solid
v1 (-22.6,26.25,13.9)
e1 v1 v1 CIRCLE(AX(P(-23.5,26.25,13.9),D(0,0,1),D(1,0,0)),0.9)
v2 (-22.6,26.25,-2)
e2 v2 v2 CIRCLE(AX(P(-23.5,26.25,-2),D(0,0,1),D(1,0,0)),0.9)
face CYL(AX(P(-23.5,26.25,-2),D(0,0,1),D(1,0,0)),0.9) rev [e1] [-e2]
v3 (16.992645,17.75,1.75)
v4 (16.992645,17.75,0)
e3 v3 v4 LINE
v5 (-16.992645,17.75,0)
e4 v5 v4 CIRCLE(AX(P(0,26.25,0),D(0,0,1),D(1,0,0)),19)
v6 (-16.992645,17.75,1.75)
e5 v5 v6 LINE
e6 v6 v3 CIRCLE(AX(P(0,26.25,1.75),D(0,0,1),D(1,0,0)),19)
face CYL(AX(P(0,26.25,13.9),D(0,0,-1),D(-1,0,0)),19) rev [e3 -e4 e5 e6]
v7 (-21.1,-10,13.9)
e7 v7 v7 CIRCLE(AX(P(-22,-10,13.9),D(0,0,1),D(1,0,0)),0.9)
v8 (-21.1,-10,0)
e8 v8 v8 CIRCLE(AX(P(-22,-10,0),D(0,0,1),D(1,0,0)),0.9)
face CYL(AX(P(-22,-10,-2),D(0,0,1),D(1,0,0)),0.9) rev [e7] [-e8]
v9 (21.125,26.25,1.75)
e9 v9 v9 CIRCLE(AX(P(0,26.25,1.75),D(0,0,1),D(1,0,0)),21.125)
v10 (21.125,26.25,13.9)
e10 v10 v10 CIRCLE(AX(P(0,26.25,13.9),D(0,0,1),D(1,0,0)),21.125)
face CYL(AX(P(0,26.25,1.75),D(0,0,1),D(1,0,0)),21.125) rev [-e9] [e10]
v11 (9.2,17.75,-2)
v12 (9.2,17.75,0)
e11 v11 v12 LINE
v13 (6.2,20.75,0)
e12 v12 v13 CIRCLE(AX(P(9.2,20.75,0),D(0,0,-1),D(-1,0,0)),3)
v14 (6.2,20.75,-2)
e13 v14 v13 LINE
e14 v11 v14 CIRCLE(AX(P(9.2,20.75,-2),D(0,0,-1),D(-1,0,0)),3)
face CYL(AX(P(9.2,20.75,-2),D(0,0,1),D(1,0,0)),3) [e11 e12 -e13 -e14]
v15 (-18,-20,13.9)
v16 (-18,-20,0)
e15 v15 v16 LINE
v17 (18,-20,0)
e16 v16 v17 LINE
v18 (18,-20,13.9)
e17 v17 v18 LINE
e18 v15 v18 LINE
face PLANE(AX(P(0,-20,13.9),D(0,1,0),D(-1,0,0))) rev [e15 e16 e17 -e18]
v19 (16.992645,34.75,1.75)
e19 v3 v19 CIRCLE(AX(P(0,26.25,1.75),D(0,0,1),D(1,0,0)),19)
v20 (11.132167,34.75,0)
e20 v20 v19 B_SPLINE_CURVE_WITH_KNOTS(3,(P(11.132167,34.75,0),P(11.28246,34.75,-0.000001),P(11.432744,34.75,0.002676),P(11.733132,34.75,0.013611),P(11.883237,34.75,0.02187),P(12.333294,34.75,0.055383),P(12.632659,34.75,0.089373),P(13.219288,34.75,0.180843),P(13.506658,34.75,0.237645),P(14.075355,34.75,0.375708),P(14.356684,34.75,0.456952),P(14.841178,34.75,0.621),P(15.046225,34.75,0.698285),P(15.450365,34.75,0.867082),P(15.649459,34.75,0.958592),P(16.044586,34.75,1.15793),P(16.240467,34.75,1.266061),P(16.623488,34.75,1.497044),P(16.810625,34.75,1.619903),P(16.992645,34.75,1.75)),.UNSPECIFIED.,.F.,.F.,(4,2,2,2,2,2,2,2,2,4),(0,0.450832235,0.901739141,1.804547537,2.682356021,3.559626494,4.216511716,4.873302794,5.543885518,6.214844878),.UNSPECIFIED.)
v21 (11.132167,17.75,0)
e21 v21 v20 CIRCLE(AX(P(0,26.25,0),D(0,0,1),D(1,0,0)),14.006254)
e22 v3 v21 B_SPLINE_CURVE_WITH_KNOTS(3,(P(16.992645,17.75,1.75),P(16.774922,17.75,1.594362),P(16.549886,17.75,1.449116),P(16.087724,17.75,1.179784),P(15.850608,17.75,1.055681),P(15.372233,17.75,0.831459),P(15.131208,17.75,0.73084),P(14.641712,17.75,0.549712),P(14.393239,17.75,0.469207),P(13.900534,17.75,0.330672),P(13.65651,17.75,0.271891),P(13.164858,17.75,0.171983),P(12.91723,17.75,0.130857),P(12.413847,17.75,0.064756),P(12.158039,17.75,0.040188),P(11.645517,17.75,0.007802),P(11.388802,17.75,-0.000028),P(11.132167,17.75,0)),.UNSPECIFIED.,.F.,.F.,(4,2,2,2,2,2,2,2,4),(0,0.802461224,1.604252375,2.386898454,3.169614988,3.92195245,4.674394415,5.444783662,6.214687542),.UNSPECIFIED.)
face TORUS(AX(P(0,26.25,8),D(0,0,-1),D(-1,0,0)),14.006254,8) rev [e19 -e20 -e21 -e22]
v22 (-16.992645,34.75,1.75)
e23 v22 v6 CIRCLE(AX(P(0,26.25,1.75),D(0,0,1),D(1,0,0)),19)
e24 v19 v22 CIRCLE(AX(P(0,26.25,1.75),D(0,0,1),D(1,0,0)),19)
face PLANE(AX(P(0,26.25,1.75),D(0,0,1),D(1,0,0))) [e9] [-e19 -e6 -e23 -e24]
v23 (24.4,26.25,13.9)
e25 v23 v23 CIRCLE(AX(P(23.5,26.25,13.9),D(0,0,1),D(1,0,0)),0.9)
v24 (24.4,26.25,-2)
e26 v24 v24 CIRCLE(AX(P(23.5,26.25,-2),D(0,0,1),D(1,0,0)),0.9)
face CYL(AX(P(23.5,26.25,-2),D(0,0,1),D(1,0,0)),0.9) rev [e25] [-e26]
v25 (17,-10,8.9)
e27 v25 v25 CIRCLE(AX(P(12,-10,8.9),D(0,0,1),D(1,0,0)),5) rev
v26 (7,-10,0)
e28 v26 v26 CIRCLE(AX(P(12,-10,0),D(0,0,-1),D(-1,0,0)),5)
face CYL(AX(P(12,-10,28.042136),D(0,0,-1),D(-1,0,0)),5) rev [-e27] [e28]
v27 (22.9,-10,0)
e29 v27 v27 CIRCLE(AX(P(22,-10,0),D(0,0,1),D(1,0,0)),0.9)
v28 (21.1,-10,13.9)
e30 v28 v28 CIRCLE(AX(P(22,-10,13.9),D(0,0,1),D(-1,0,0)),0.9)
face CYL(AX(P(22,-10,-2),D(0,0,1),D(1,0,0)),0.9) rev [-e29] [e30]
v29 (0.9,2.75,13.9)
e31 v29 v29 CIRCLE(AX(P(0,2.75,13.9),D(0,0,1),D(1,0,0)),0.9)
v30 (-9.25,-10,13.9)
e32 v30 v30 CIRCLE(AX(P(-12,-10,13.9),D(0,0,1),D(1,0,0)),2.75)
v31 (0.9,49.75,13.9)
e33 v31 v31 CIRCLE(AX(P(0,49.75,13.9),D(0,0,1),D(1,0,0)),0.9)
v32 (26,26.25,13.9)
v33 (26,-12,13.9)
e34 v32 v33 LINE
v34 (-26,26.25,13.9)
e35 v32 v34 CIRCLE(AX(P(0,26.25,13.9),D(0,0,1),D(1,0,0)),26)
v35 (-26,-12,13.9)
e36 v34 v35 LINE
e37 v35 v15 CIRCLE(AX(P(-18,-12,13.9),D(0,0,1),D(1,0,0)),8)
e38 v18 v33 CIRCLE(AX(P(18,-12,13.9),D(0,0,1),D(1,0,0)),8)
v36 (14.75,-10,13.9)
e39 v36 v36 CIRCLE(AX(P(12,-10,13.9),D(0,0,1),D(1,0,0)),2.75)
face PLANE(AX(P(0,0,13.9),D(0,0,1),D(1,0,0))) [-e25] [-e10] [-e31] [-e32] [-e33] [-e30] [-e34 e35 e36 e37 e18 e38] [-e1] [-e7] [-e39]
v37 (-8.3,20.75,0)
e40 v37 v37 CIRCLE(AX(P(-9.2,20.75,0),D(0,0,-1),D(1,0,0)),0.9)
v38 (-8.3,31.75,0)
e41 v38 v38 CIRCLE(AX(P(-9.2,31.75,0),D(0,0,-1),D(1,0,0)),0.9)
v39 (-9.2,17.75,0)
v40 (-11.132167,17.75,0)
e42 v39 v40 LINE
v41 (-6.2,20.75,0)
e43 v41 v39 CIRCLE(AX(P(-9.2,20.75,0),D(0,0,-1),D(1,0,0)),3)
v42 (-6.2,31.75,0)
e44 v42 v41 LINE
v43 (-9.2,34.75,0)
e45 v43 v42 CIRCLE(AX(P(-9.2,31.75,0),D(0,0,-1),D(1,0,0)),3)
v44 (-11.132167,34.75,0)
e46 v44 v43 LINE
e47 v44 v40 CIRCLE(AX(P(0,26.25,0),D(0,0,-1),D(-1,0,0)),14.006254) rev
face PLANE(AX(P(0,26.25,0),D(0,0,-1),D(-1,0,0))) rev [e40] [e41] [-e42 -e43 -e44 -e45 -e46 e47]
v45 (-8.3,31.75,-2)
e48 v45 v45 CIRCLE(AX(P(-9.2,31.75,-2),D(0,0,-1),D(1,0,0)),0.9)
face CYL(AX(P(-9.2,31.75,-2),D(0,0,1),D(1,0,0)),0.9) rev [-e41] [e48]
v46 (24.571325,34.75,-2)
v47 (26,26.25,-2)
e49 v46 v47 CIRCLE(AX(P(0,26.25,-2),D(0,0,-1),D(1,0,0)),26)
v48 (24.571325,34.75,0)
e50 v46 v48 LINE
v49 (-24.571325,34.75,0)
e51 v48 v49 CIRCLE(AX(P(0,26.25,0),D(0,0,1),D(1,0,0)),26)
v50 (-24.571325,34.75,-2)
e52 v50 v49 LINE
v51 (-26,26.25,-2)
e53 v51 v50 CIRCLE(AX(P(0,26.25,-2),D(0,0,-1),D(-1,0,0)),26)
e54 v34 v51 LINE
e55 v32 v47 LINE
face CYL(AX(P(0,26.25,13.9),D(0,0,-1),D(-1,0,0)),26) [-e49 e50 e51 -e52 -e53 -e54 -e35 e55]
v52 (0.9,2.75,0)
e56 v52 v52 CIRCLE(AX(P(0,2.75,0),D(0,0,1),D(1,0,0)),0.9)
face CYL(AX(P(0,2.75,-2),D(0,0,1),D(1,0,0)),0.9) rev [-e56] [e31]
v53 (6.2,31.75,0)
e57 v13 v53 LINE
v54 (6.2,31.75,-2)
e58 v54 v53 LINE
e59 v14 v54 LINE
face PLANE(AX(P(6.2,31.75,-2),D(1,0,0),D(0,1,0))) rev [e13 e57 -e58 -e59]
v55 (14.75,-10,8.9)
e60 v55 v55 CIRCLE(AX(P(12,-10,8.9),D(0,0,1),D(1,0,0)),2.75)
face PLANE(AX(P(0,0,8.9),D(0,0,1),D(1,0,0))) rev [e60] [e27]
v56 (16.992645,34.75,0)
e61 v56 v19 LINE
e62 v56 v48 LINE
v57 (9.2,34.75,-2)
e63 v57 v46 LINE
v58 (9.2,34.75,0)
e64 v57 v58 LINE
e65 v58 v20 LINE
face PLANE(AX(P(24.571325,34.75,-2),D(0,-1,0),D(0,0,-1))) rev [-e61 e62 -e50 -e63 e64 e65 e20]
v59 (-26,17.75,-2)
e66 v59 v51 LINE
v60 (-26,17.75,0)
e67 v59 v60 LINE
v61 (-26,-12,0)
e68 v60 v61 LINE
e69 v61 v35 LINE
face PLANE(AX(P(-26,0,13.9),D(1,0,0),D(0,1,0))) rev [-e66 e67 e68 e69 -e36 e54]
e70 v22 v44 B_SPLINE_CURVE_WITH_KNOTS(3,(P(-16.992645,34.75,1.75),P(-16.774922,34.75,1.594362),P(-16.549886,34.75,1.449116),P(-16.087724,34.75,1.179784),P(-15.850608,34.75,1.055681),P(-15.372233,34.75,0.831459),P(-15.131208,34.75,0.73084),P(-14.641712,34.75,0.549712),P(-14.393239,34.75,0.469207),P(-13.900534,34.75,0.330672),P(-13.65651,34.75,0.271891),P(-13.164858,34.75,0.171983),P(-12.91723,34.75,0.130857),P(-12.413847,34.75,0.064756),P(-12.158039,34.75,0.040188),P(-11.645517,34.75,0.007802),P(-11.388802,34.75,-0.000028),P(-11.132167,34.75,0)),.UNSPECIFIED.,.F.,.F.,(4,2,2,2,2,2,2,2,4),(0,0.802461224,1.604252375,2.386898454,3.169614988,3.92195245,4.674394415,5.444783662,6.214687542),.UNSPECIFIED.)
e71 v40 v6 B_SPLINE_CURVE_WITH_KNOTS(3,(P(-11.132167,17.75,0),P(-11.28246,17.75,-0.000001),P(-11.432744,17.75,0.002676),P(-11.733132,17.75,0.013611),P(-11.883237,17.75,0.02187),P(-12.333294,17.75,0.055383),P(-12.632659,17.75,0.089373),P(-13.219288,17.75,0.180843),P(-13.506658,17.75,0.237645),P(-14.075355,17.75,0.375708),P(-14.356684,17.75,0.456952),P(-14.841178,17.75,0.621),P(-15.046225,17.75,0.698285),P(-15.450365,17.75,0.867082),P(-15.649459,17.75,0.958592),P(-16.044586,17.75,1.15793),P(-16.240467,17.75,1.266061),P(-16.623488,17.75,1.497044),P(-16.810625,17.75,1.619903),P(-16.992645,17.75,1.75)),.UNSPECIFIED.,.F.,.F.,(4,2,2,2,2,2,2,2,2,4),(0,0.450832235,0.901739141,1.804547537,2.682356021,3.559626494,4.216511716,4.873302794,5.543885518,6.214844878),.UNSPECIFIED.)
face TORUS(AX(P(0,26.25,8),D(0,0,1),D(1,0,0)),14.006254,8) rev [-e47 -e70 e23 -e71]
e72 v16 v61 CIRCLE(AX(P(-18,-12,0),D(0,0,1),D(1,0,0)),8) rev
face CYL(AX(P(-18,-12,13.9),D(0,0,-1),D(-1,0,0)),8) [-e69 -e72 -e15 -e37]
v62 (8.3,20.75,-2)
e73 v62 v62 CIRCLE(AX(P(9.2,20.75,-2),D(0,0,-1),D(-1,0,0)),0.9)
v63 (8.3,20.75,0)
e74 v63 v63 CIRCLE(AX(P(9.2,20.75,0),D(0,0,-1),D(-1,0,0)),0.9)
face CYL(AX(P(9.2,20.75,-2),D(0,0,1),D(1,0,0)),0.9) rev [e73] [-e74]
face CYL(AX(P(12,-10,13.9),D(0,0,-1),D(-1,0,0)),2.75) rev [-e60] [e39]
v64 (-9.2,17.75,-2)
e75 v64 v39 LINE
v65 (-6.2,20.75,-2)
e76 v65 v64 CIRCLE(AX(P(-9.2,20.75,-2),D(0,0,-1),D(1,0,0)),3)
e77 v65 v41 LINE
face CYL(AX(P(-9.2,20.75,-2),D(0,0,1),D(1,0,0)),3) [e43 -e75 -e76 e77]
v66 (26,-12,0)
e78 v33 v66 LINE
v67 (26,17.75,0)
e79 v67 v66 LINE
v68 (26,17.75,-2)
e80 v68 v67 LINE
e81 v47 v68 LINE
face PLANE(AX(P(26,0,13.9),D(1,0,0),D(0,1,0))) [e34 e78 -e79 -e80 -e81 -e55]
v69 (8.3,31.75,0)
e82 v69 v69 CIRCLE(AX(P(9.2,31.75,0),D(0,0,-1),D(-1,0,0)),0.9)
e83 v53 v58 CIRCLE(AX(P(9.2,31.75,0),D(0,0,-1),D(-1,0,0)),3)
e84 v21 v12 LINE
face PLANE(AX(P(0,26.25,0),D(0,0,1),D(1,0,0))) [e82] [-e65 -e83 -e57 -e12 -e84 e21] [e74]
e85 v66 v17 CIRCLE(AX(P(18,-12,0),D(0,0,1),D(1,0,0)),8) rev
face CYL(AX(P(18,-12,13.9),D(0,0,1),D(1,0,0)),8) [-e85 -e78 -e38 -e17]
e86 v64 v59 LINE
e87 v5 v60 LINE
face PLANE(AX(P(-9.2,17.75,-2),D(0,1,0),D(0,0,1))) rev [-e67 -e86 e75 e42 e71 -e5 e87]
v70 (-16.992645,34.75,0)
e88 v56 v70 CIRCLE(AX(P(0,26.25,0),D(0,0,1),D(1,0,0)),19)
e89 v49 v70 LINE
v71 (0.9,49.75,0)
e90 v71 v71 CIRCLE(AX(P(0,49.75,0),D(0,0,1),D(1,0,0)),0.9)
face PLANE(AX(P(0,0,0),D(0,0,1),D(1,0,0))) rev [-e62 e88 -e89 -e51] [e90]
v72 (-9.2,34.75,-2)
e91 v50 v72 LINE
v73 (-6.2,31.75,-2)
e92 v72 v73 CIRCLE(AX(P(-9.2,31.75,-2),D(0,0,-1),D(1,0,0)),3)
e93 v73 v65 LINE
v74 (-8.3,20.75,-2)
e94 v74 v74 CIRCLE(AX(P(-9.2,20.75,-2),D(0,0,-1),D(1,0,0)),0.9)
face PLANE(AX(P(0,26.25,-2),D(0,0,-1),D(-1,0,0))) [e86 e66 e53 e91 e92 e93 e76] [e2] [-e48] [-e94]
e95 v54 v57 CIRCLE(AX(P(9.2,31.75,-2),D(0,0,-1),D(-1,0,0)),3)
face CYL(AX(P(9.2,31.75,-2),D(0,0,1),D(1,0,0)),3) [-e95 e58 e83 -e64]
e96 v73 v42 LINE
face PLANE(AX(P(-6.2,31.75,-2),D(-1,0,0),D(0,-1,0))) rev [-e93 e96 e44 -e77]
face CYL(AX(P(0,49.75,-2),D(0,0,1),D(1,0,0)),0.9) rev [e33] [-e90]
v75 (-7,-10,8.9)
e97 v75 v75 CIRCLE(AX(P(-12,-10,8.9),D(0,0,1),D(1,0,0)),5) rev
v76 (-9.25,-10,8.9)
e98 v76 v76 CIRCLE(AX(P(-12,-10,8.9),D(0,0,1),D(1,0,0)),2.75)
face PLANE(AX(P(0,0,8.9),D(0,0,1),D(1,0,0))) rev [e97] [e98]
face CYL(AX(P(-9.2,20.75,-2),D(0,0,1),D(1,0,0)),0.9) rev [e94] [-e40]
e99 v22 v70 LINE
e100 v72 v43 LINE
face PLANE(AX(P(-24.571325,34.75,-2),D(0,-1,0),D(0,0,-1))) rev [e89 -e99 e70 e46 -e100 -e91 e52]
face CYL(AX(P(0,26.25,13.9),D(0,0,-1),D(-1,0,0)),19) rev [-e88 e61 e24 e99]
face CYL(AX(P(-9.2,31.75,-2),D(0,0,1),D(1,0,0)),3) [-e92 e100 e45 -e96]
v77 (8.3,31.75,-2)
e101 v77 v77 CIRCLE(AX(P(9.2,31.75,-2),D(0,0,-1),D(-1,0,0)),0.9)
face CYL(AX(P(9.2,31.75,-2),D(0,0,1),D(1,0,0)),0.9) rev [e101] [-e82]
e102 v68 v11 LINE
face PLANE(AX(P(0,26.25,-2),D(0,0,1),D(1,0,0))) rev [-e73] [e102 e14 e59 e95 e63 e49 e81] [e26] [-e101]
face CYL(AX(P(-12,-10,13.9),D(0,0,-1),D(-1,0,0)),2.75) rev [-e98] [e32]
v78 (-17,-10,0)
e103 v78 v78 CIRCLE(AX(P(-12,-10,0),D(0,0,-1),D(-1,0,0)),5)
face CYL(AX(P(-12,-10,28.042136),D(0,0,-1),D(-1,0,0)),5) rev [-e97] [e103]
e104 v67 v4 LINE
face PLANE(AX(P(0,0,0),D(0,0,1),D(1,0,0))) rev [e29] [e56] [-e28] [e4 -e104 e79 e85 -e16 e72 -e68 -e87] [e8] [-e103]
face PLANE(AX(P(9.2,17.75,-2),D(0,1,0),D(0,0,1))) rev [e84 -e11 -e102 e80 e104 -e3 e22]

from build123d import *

# Parameters (mm, degrees)
SKETCH_2_R          = 19
SKETCH_2_R_2        = 2.75
EXTRUDE_1_DEPTH     = 13.9
SKETCH_3_R          = 21.125
CUT_EXTRUDE_1_DEPTH = 12.15
SKETCH_4_R          = 5
CUT_EXTRUDE_2_DEPTH = 8.9
FILLET_1_R          = 8
EXTRUDE_START       = 2
SKETCH_7_R          = 0.9
EXTRUDE_2_DEPTH     = 2
SKETCH_5_R          = 0.9
CUT_EXTRUDE_3_DEPTH = 61.488614631
FILLET_2_R          = 8


with BuildPart() as part:
    # Эскиз2 → Бобышка-Вытянуть1 (new body)
    with BuildSketch(Plane.XY):
        with BuildLine():
            ThreePointArc((26, 26.25), (0, 52.25), (-26, 26.25))
            Line((-26, 26.25), (-26, -20))
            Line((-26, -20), (26, -20))
            Line((26, -20), (26, 26.25))
        make_face()
        with Locations((0, 26.25)):
            Circle(SKETCH_2_R, mode=Mode.SUBTRACT)
        with Locations((12, -10)):
            Circle(SKETCH_2_R_2, mode=Mode.SUBTRACT)
        with Locations((-12, -10)):
            Circle(SKETCH_2_R_2, mode=Mode.SUBTRACT)
    extrude(amount=EXTRUDE_1_DEPTH)

    # Эскиз3 → Вырез-Вытянуть1 (cut)
    with BuildSketch(Plane.XY.offset(13.9)):
        with Locations((0, 26.25)):
            Circle(SKETCH_3_R)
    extrude(amount=-CUT_EXTRUDE_1_DEPTH, mode=Mode.SUBTRACT)

    # Эскиз4 → Вырез-Вытянуть2 (cut)
    with BuildSketch(Plane(origin=(0, 0, 0), x_dir=(-1, 0, 0), z_dir=(0, 0, -1))):
        with Locations((-12, -10)):
            Circle(SKETCH_4_R)
        with Locations((12, -10)):
            Circle(SKETCH_4_R)
    extrude(amount=-CUT_EXTRUDE_2_DEPTH, mode=Mode.SUBTRACT)

    # Скругление1
    fillet_1_edges = [part.edges().sort_by_distance(p)[0] for p in [
        (26, -20, 6.95),
        (-26, -20, 6.95),
    ]]
    fillet(fillet_1_edges, radius=FILLET_1_R)

    # Эскиз7 → Бобышка-Вытянуть2 (add)
    # profile 1 of 2: a face of its own
    with BuildSketch(Plane(origin=(0, 0, 0), x_dir=(-1, 0, 0), z_dir=(0, 0, -1)).offset(EXTRUDE_START)):
        with BuildLine():
            Line((-24.571324751, 34.75), (-9.2, 34.75))
            ThreePointArc((-9.2, 34.75), (-7.078679656, 33.871320344), (-6.2, 31.75))
            Line((-6.2, 31.75), (-6.2, 20.75))
            ThreePointArc((-6.2, 20.75), (-7.078679656, 18.628679656), (-9.2, 17.75))
            Line((-9.2, 17.75), (-26, 17.75))
            Line((-26, 17.75), (-26, 26.25))
            ThreePointArc((-26, 26.25), (-25.640343636, 30.559614628), (-24.571324751, 34.75))
        make_face()
        with Locations((-9.2, 31.75)):
            Circle(SKETCH_7_R, mode=Mode.SUBTRACT)
        with Locations((-9.2, 20.75)):
            Circle(SKETCH_7_R, mode=Mode.SUBTRACT)
    # profile 2 of 2: a face of its own
    with BuildSketch(Plane(origin=(0, 0, 0), x_dir=(-1, 0, 0), z_dir=(0, 0, -1)).offset(EXTRUDE_START)):
        with BuildLine():
            Line((26, 26.25), (26, 17.75))
            Line((26, 17.75), (9.2, 17.75))
            ThreePointArc((9.2, 17.75), (7.078679656, 18.628679656), (6.2, 20.75))
            Line((6.2, 20.75), (6.2, 31.75))
            ThreePointArc((6.2, 31.75), (7.078679656, 33.871320344), (9.2, 34.75))
            Line((9.2, 34.75), (24.571324751, 34.75))
            ThreePointArc((24.571324751, 34.75), (25.640343636, 30.559614628), (26, 26.25))
        make_face()
        with Locations(Location((9.2, 20.75, 0), (0, 0, 180))):
            Circle(SKETCH_7_R, mode=Mode.SUBTRACT)
        with Locations(Location((9.2, 31.75, 0), (0, 0, 180))):
            Circle(SKETCH_7_R, mode=Mode.SUBTRACT)
    extrude(amount=-EXTRUDE_2_DEPTH)

    # Эскиз5 → Вырез-Вытянуть3 (cut, through all)
    with BuildSketch(Plane.XY.offset(13.9)):
        with Locations((0, 49.75)):
            Circle(SKETCH_5_R)
        with Locations((-23.5, 26.25)):
            Circle(SKETCH_5_R)
        with Locations((0, 2.75)):
            Circle(SKETCH_5_R)
        with Locations((23.5, 26.25)):
            Circle(SKETCH_5_R)
        with Locations((-22, -10)):
            Circle(SKETCH_5_R)
        with Locations((22, -10)):
            Circle(SKETCH_5_R)
    extrude(amount=-CUT_EXTRUDE_3_DEPTH, mode=Mode.SUBTRACT)

    # Скругление2
    # the kernel refuses this fillet: 8 mm, written as the material it adds along each edge
    with BuildSketch(Plane(origin=(0, 26.25, 0), x_dir=(1, 0, 0), z_dir=(0, -1, 0))) as fillet_2_piece_1_section:
        with BuildLine():
            CenterArc((14.006253911, 8), FILLET_2_R, 270, 38.624832873)
            Line((14.006253911, 0), (19, 0))
            Line((19, 0), (19, 1.75))
        make_face()
    fillet_2_piece_1 = revolve(axis=Axis((0, 26.25, 0), (0, 0, 1)), revolution_arc=64.223731821, mode=Mode.PRIVATE)
    fillet_2_piece_1 = split(fillet_2_piece_1, bisect_by=Plane(origin=(15.779655811, 34.75, 0.435065896), z_dir=(0, -1, 0)), keep=Keep.TOP, mode=Mode.PRIVATE)
    add(fillet_2_piece_1)
    with BuildSketch(Plane(origin=(0, 26.25, 0), x_dir=(-0.43479598917537754, 0.900528982208238, 0), z_dir=(0.900528982208238, 0.43479598917537754, 0))) as fillet_2_piece_2_section:
        with BuildLine():
            CenterArc((14.006253911, 8), FILLET_2_R, 270, 38.624832873)
            Line((14.006253911, 0), (19, 0))
            Line((19, 0), (19, 1.75))
        make_face()
    fillet_2_piece_2 = revolve(axis=Axis((0, 26.25, 0), (0, 0, 1)), revolution_arc=128.45537387, mode=Mode.PRIVATE)
    fillet_2_piece_2 = split(fillet_2_piece_2, bisect_by=Plane(origin=(-16.657296725, 17.75, 0.435065896), z_dir=(0, 1, 0)), keep=Keep.TOP, mode=Mode.PRIVATE)
    fillet_2_piece_2 = split(fillet_2_piece_2, bisect_by=Plane(origin=(-16.657296725, 34.75, 0.435065896), z_dir=(0, -1, 0)), keep=Keep.TOP, mode=Mode.PRIVATE)
    add(fillet_2_piece_2)
    with BuildSketch(Plane(origin=(0, 26.25, 0), x_dir=(0.43485815144729206, -0.9004989661958774, 0), z_dir=(-0.9004989661958774, -0.43485815144729206, 0))) as fillet_2_piece_3_section:
        with BuildLine():
            CenterArc((14.006253911, 8), FILLET_2_R, 270, 38.624832873)
            Line((14.006253911, 0), (19, 0))
            Line((19, 0), (19, 1.75))
        make_face()
    fillet_2_piece_3 = revolve(axis=Axis((0, 26.25, 0), (0, 0, 1)), revolution_arc=64.223731821, mode=Mode.PRIVATE)
    fillet_2_piece_3 = split(fillet_2_piece_3, bisect_by=Plane(origin=(15.779655811, 17.75, 0.435065896), z_dir=(0, 1, 0)), keep=Keep.TOP, mode=Mode.PRIVATE)
    add(fillet_2_piece_3)


solid = part.part
